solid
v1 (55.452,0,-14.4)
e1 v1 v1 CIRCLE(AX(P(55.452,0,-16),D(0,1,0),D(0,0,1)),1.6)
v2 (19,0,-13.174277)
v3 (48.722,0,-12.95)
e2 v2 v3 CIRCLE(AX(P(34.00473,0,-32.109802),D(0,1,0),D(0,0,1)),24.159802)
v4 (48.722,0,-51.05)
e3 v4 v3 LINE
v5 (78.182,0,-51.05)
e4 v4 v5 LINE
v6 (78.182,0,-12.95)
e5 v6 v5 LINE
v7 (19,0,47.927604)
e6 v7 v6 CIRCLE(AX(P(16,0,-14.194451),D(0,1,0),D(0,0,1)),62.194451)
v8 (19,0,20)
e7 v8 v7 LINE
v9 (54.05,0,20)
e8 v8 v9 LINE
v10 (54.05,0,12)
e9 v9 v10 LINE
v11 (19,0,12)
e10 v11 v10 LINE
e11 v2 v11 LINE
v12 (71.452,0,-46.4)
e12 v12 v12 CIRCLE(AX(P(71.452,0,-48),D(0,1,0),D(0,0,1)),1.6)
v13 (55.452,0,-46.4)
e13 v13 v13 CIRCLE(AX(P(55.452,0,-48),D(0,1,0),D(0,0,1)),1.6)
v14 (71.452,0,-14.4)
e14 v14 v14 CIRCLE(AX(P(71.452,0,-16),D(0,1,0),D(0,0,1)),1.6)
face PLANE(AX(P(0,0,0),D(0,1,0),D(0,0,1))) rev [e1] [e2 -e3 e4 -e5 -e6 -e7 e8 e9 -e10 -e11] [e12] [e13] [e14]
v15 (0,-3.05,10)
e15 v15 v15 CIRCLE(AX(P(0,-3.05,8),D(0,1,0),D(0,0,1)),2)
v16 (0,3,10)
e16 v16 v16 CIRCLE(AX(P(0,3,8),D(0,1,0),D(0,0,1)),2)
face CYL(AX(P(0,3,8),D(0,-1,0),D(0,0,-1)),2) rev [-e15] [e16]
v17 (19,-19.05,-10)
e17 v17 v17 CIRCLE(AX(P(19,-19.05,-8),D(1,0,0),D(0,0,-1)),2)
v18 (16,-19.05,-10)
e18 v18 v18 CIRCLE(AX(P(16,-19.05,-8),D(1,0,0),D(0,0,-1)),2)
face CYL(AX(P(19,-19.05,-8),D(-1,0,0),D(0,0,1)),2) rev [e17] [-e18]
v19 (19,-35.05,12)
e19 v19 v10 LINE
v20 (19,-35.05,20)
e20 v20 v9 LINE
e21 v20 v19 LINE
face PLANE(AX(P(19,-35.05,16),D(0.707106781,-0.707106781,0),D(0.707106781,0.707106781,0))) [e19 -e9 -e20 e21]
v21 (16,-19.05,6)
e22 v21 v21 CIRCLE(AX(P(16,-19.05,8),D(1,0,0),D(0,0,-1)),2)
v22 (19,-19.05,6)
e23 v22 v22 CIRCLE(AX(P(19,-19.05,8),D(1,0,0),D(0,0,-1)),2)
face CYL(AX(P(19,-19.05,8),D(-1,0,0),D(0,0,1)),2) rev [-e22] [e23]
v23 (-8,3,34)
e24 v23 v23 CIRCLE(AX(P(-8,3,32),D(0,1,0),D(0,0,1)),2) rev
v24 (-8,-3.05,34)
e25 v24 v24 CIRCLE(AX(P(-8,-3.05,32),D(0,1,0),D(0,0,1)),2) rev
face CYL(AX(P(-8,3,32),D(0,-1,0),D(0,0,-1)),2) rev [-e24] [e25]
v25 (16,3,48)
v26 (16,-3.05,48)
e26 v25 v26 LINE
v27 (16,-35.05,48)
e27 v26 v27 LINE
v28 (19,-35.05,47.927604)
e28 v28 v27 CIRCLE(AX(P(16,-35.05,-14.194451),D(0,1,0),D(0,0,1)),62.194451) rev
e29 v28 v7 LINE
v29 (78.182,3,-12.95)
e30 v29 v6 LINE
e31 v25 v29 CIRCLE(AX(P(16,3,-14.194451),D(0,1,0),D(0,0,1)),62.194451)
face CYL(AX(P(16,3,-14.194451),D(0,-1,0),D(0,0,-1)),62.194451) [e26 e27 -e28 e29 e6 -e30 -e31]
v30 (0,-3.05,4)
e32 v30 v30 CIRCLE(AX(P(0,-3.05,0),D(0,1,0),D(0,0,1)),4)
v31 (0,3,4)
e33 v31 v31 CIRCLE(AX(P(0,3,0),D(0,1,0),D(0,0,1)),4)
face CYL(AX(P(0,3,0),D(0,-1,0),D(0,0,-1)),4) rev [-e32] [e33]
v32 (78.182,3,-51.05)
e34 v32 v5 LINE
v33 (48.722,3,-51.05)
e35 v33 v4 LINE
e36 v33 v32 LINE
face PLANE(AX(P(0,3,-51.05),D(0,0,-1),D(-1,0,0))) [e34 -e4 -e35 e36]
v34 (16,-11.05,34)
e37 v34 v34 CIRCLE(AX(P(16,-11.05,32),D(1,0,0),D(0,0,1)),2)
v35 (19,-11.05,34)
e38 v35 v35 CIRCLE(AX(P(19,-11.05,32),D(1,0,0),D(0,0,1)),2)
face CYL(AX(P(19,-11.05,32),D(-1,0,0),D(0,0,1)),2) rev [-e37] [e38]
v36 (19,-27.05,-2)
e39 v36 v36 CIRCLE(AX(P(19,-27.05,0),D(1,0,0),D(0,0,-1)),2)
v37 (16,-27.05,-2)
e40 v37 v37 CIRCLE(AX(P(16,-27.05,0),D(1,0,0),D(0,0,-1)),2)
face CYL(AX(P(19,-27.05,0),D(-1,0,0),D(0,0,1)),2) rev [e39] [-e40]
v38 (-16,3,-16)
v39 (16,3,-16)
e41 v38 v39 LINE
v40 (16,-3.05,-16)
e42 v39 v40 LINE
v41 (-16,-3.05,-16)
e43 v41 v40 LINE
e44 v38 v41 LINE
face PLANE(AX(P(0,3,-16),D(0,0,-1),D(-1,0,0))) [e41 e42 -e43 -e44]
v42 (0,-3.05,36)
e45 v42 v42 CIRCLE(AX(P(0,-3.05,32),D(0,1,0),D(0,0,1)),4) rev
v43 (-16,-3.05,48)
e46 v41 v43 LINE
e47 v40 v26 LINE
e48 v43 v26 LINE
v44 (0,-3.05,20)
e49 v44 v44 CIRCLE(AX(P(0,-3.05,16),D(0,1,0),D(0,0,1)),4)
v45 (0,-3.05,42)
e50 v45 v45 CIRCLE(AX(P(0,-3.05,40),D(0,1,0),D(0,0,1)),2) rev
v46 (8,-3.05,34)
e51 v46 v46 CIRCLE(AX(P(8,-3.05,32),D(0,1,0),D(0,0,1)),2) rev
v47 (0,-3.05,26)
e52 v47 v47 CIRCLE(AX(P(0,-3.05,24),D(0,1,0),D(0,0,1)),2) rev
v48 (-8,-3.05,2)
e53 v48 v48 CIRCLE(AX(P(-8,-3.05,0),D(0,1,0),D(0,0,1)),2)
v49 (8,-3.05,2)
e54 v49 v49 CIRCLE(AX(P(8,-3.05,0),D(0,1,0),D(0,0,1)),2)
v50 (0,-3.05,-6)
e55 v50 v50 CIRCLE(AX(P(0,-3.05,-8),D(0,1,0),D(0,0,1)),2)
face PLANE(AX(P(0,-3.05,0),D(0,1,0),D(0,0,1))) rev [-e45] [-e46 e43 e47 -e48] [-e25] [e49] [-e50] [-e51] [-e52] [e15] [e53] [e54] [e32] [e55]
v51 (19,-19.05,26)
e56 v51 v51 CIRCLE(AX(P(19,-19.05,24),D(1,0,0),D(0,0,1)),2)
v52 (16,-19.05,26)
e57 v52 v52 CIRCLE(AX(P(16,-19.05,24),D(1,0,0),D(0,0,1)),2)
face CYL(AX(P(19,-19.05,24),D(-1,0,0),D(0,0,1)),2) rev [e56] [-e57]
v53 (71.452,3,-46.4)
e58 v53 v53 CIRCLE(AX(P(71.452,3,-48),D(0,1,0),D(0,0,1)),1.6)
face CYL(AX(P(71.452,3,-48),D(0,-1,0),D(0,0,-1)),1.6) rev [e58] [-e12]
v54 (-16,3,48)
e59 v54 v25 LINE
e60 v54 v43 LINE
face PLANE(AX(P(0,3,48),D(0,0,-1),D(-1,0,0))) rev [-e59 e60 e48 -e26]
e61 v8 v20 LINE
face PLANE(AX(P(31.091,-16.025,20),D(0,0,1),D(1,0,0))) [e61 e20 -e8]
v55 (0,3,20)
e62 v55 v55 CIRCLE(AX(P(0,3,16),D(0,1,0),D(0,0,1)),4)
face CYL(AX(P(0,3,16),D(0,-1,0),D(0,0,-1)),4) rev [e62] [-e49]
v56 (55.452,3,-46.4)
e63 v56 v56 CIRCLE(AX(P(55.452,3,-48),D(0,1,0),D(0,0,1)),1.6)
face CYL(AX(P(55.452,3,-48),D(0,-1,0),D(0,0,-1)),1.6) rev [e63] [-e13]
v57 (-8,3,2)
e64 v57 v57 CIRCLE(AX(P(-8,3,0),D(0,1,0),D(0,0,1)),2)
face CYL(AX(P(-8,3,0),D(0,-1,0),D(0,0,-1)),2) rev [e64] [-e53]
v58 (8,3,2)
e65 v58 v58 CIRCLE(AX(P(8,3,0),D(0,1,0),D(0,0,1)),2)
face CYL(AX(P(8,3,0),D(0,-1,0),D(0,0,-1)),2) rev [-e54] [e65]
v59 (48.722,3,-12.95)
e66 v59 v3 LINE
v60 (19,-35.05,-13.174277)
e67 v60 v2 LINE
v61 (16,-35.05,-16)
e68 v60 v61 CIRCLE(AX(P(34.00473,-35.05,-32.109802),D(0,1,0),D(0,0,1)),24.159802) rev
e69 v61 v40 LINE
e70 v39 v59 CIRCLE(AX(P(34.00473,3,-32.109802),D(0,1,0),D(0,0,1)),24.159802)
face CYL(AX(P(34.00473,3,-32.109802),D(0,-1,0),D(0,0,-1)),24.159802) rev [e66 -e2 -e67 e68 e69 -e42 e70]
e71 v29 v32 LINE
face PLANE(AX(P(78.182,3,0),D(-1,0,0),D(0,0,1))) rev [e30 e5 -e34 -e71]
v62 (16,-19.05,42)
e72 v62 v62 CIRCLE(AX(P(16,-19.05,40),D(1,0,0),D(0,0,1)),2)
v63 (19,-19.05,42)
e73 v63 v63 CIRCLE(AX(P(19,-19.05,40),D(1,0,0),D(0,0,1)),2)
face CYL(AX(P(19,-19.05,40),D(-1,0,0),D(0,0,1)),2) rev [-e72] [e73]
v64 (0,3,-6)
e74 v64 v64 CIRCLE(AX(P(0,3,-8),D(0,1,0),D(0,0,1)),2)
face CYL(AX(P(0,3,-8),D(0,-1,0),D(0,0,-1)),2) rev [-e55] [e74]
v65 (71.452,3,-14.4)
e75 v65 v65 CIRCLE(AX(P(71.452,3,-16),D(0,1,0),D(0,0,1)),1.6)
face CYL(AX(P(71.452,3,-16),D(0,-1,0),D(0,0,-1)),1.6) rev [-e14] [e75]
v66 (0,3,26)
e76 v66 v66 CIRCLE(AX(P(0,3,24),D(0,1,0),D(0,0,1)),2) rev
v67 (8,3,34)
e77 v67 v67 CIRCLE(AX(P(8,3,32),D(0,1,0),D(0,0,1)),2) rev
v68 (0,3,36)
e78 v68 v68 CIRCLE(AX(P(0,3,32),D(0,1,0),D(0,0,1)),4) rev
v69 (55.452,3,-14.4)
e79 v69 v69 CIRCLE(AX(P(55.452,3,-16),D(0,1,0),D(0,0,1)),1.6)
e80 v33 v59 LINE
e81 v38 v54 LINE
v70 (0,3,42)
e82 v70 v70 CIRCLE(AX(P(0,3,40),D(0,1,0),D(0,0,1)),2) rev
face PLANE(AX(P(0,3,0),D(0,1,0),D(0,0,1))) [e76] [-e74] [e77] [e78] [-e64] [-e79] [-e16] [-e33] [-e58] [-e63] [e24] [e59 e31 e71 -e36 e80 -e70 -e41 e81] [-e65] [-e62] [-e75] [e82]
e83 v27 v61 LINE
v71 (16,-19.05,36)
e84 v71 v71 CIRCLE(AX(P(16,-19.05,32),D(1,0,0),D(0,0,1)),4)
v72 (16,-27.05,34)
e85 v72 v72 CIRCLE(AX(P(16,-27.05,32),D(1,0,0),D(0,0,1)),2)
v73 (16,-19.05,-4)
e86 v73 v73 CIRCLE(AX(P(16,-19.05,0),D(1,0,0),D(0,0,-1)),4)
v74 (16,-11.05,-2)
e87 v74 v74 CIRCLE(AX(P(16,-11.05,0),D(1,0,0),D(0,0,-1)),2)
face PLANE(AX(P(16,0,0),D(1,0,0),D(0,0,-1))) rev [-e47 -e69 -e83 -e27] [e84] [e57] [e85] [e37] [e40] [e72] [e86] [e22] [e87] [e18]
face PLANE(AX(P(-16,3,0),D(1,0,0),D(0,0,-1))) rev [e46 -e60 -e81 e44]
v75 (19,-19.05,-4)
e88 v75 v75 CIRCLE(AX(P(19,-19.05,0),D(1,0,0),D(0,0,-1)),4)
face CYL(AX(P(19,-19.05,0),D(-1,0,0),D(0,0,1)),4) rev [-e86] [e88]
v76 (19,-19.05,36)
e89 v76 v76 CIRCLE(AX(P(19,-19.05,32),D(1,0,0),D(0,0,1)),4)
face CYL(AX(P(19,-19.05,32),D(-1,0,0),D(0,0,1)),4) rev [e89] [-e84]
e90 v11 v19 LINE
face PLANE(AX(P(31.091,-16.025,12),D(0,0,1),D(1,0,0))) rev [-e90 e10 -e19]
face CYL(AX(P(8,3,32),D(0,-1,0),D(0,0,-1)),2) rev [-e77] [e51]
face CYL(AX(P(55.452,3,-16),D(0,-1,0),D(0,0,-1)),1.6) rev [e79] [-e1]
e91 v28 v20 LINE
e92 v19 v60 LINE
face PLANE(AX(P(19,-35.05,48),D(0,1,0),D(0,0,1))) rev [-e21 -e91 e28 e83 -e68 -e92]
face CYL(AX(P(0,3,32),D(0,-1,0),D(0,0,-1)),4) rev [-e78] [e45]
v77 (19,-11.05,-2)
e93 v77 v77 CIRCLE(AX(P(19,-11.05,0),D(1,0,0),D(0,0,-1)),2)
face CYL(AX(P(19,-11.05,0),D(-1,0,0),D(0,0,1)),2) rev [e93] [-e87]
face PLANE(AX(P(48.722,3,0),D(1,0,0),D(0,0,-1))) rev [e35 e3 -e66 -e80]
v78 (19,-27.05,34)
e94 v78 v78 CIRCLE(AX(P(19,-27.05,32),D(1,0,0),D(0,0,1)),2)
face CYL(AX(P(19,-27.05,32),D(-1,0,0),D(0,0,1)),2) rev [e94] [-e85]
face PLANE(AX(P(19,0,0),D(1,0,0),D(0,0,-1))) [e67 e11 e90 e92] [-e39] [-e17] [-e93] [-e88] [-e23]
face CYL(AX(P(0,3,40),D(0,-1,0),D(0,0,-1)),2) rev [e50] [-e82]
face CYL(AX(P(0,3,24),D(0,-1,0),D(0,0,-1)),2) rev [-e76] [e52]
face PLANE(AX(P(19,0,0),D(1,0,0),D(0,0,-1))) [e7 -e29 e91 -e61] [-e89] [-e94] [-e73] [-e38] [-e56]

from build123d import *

# Parameters (mm, degrees)
SKETCH1_W           = 32
SKETCH1_H           = 64
SKETCH1_R           = 4
SKETCH1_R_2         = 2
SKETCH1_R_3         = 1.6
BOSS_EXTRUDE1_DEPTH = 3
BOSS_EXTRUDE2_START = -3.05
SKETCH1_5_W         = 32
SKETCH1_5_H         = 64
SKETCH1_5_R         = 4
SKETCH1_5_R_2       = 2
BOSS_EXTRUDE2_DEPTH = 3.05
SKETCH2_W           = 64
SKETCH2_H           = 35.05
SKETCH2_R           = 4
SKETCH2_R_2         = 2
BOSS_EXTRUDE3_DEPTH = 3
CUT_EXTRUDE1_START  = -38.05
CUT_EXTRUDE1_DEPTH  = 35.05
CUT_EXTRUDE2_START  = -38.05
CUT_EXTRUDE2_DEPTH  = 35.05
RIB1_REACH          = 110.796
SKETCH4_WALL_W      = 269.16074152
SKETCH4_WALL_H      = 8


# Read off the part's stored shape, not the designer's step: Cut-Extrude1, Cut-Extrude2
with BuildPart() as part:
    # Sketch1 → Boss-Extrude1 (new body)
    # profile 1 of 2: a face of its own
    with BuildSketch(Plane(origin=(0, 0, 0), x_dir=(1, 0, 0), z_dir=(0, 1, 0))):
        with Locations((0, -16)):
            Rectangle(SKETCH1_W, SKETCH1_H)
        with Locations(Location((0, -32, 0), (0, 0, 270))):
            Circle(SKETCH1_R, mode=Mode.SUBTRACT)
        with Locations(Location((0, -40, 0), (0, 0, 270))):
            Circle(SKETCH1_R_2, mode=Mode.SUBTRACT)
        with Locations(Location((0, 0, 0), (0, 0, 270))):
            Circle(SKETCH1_R, mode=Mode.SUBTRACT)
        with Locations(Location((0, 8, 0), (0, 0, 270))):
            Circle(SKETCH1_R_2, mode=Mode.SUBTRACT)
        with Locations(Location((0, -16, 0), (0, 0, 270))):
            Circle(SKETCH1_R, mode=Mode.SUBTRACT)
        with Locations(Location((8, 0, 0), (0, 0, 270))):
            Circle(SKETCH1_R_2, mode=Mode.SUBTRACT)
        with Locations(Location((0, -8, 0), (0, 0, 270))):
            Circle(SKETCH1_R_2, mode=Mode.SUBTRACT)
        with Locations(Location((-8, 0, 0), (0, 0, 270))):
            Circle(SKETCH1_R_2, mode=Mode.SUBTRACT)
        with Locations(Location((-8, -32, 0), (0, 0, 270))):
            Circle(SKETCH1_R_2, mode=Mode.SUBTRACT)
        with Locations(Location((8, -32, 0), (0, 0, 270))):
            Circle(SKETCH1_R_2, mode=Mode.SUBTRACT)
        with Locations(Location((0, -24, 0), (0, 0, 270))):
            Circle(SKETCH1_R_2, mode=Mode.SUBTRACT)
    # profile 2 of 2: a face of its own
    with BuildSketch(Plane(origin=(0, 0, 0), x_dir=(1, 0, 0), z_dir=(0, 1, 0))):
        with BuildLine():
            ThreePointArc((16, 16), (31.762527334, 8.054271284), (48.722, 12.95))
            Line((48.722, 12.95), (48.722, 51.05))
            Line((48.722, 51.05), (78.182, 51.05))
            Line((78.182, 51.05), (78.182, 12.95))
            ThreePointArc((78.182, 12.95), (59.535915128, -30.221467801), (16, -48))
            Line((16, -48), (16, 16))
        make_face()
        with Locations(Location((71.452, 16, 0), (0, 0, 270))):
            Circle(SKETCH1_R_3, mode=Mode.SUBTRACT)
        with Locations(Location((71.452, 48, 0), (0, 0, 270))):
            Circle(SKETCH1_R_3, mode=Mode.SUBTRACT)
        with Locations(Location((55.452, 48, 0), (0, 0, 270))):
            Circle(SKETCH1_R_3, mode=Mode.SUBTRACT)
        with Locations(Location((55.452, 16, 0), (0, 0, 270))):
            Circle(SKETCH1_R_3, mode=Mode.SUBTRACT)
    extrude(amount=BOSS_EXTRUDE1_DEPTH)

    # Sketch1<5> → Boss-Extrude2 (add)
    with BuildSketch(Plane(origin=(0, 0, 0), x_dir=(1, 0, 0), z_dir=(0, 1, 0)).offset(BOSS_EXTRUDE2_START)):
        with Locations((0, -16)):
            Rectangle(SKETCH1_5_W, SKETCH1_5_H)
        with Locations(Location((0, -32, 0), (0, 0, 270))):
            Circle(SKETCH1_5_R, mode=Mode.SUBTRACT)
        with Locations(Location((0, -40, 0), (0, 0, 270))):
            Circle(SKETCH1_5_R_2, mode=Mode.SUBTRACT)
        with Locations(Location((0, 0, 0), (0, 0, 270))):
            Circle(SKETCH1_5_R, mode=Mode.SUBTRACT)
        with Locations(Location((0, 8, 0), (0, 0, 270))):
            Circle(SKETCH1_5_R_2, mode=Mode.SUBTRACT)
        with Locations(Location((0, -16, 0), (0, 0, 270))):
            Circle(SKETCH1_5_R, mode=Mode.SUBTRACT)
        with Locations(Location((8, 0, 0), (0, 0, 270))):
            Circle(SKETCH1_5_R_2, mode=Mode.SUBTRACT)
        with Locations(Location((0, -8, 0), (0, 0, 270))):
            Circle(SKETCH1_5_R_2, mode=Mode.SUBTRACT)
        with Locations(Location((-8, 0, 0), (0, 0, 270))):
            Circle(SKETCH1_5_R_2, mode=Mode.SUBTRACT)
        with Locations(Location((-8, -32, 0), (0, 0, 270))):
            Circle(SKETCH1_5_R_2, mode=Mode.SUBTRACT)
        with Locations(Location((8, -32, 0), (0, 0, 270))):
            Circle(SKETCH1_5_R_2, mode=Mode.SUBTRACT)
        with Locations(Location((0, -24, 0), (0, 0, 270))):
            Circle(SKETCH1_5_R_2, mode=Mode.SUBTRACT)
    extrude(amount=BOSS_EXTRUDE2_DEPTH)

    # Sketch2 → Boss-Extrude3 (add)
    with BuildSketch(Plane(origin=(16, 0, 0), x_dir=(0, 0, -1), z_dir=(1, 0, 0))):
        with Locations((-16, -17.525)):
            Rectangle(SKETCH2_W, SKETCH2_H)
        with Locations((0, -19.05)):
            Circle(SKETCH2_R, mode=Mode.SUBTRACT)
        with Locations((8, -19.05)):
            Circle(SKETCH2_R_2, mode=Mode.SUBTRACT)
        with Locations((0, -27.05)):
            Circle(SKETCH2_R_2, mode=Mode.SUBTRACT)
        with Locations((-8, -19.05)):
            Circle(SKETCH2_R_2, mode=Mode.SUBTRACT)
        with Locations((0, -11.05)):
            Circle(SKETCH2_R_2, mode=Mode.SUBTRACT)
        with Locations(Location((-32, -27.05, 0), (0, 0, 180))):
            Circle(SKETCH2_R_2, mode=Mode.SUBTRACT)
        with Locations(Location((-40, -19.05, 0), (0, 0, 180))):
            Circle(SKETCH2_R_2, mode=Mode.SUBTRACT)
        with Locations(Location((-24, -19.05, 0), (0, 0, 180))):
            Circle(SKETCH2_R_2, mode=Mode.SUBTRACT)
        with Locations(Location((-32, -11.05, 0), (0, 0, 180))):
            Circle(SKETCH2_R_2, mode=Mode.SUBTRACT)
        with Locations(Location((-32, -19.05, 0), (0, 0, 180))):
            Circle(SKETCH2_R, mode=Mode.SUBTRACT)
    extrude(amount=BOSS_EXTRUDE3_DEPTH)

    # Cut-Extrude1 outline → Cut-Extrude1 (cut)
    with BuildSketch(Plane(origin=(0, 3, 0), x_dir=(1, 0, 0), z_dir=(0, 1, 0)).offset(CUT_EXTRUDE1_START)):
        with BuildLine():
            ThreePointArc((16, 16), (17.439637495, 14.523053201), (19, 13.174277157))
            Line((19, 13.174277157), (19, 16))
            Line((19, 16), (16, 16))
        make_face()
    extrude(amount=CUT_EXTRUDE1_DEPTH, mode=Mode.SUBTRACT)

    # Cut-Extrude2 outline → Cut-Extrude2 (cut)
    with BuildSketch(Plane(origin=(0, 3, 0), x_dir=(1, 0, 0), z_dir=(0, 1, 0)).offset(CUT_EXTRUDE2_START)):
        with BuildLine():
            Line((16, -48), (19, -48))
            Line((19, -48), (19, -47.927604143))
            ThreePointArc((19, -47.927604143), (17.5004367, -47.981898402), (16, -48))
        make_face()
    extrude(amount=CUT_EXTRUDE2_DEPTH, mode=Mode.SUBTRACT)

    # Sketch4 wall → Rib1 (add, up to next)
    with BuildSketch(Plane(origin=(36.525, -17.525, 16), x_dir=(0.707106781187, 0.707106781187, 0), z_dir=(-0.707106781187, 0.707106781187, 0)), mode=Mode.PRIVATE) as rib1_sk1:
        Rectangle(SKETCH4_WALL_W, SKETCH4_WALL_H)
    rib1_tool1 = extrude(rib1_sk1.sketch, amount=RIB1_REACH, mode=Mode.PRIVATE) - part.part
    add(rib1_tool1.solids().sort_by_distance((36.525, -17.525, 16))[0])


solid = part.part
